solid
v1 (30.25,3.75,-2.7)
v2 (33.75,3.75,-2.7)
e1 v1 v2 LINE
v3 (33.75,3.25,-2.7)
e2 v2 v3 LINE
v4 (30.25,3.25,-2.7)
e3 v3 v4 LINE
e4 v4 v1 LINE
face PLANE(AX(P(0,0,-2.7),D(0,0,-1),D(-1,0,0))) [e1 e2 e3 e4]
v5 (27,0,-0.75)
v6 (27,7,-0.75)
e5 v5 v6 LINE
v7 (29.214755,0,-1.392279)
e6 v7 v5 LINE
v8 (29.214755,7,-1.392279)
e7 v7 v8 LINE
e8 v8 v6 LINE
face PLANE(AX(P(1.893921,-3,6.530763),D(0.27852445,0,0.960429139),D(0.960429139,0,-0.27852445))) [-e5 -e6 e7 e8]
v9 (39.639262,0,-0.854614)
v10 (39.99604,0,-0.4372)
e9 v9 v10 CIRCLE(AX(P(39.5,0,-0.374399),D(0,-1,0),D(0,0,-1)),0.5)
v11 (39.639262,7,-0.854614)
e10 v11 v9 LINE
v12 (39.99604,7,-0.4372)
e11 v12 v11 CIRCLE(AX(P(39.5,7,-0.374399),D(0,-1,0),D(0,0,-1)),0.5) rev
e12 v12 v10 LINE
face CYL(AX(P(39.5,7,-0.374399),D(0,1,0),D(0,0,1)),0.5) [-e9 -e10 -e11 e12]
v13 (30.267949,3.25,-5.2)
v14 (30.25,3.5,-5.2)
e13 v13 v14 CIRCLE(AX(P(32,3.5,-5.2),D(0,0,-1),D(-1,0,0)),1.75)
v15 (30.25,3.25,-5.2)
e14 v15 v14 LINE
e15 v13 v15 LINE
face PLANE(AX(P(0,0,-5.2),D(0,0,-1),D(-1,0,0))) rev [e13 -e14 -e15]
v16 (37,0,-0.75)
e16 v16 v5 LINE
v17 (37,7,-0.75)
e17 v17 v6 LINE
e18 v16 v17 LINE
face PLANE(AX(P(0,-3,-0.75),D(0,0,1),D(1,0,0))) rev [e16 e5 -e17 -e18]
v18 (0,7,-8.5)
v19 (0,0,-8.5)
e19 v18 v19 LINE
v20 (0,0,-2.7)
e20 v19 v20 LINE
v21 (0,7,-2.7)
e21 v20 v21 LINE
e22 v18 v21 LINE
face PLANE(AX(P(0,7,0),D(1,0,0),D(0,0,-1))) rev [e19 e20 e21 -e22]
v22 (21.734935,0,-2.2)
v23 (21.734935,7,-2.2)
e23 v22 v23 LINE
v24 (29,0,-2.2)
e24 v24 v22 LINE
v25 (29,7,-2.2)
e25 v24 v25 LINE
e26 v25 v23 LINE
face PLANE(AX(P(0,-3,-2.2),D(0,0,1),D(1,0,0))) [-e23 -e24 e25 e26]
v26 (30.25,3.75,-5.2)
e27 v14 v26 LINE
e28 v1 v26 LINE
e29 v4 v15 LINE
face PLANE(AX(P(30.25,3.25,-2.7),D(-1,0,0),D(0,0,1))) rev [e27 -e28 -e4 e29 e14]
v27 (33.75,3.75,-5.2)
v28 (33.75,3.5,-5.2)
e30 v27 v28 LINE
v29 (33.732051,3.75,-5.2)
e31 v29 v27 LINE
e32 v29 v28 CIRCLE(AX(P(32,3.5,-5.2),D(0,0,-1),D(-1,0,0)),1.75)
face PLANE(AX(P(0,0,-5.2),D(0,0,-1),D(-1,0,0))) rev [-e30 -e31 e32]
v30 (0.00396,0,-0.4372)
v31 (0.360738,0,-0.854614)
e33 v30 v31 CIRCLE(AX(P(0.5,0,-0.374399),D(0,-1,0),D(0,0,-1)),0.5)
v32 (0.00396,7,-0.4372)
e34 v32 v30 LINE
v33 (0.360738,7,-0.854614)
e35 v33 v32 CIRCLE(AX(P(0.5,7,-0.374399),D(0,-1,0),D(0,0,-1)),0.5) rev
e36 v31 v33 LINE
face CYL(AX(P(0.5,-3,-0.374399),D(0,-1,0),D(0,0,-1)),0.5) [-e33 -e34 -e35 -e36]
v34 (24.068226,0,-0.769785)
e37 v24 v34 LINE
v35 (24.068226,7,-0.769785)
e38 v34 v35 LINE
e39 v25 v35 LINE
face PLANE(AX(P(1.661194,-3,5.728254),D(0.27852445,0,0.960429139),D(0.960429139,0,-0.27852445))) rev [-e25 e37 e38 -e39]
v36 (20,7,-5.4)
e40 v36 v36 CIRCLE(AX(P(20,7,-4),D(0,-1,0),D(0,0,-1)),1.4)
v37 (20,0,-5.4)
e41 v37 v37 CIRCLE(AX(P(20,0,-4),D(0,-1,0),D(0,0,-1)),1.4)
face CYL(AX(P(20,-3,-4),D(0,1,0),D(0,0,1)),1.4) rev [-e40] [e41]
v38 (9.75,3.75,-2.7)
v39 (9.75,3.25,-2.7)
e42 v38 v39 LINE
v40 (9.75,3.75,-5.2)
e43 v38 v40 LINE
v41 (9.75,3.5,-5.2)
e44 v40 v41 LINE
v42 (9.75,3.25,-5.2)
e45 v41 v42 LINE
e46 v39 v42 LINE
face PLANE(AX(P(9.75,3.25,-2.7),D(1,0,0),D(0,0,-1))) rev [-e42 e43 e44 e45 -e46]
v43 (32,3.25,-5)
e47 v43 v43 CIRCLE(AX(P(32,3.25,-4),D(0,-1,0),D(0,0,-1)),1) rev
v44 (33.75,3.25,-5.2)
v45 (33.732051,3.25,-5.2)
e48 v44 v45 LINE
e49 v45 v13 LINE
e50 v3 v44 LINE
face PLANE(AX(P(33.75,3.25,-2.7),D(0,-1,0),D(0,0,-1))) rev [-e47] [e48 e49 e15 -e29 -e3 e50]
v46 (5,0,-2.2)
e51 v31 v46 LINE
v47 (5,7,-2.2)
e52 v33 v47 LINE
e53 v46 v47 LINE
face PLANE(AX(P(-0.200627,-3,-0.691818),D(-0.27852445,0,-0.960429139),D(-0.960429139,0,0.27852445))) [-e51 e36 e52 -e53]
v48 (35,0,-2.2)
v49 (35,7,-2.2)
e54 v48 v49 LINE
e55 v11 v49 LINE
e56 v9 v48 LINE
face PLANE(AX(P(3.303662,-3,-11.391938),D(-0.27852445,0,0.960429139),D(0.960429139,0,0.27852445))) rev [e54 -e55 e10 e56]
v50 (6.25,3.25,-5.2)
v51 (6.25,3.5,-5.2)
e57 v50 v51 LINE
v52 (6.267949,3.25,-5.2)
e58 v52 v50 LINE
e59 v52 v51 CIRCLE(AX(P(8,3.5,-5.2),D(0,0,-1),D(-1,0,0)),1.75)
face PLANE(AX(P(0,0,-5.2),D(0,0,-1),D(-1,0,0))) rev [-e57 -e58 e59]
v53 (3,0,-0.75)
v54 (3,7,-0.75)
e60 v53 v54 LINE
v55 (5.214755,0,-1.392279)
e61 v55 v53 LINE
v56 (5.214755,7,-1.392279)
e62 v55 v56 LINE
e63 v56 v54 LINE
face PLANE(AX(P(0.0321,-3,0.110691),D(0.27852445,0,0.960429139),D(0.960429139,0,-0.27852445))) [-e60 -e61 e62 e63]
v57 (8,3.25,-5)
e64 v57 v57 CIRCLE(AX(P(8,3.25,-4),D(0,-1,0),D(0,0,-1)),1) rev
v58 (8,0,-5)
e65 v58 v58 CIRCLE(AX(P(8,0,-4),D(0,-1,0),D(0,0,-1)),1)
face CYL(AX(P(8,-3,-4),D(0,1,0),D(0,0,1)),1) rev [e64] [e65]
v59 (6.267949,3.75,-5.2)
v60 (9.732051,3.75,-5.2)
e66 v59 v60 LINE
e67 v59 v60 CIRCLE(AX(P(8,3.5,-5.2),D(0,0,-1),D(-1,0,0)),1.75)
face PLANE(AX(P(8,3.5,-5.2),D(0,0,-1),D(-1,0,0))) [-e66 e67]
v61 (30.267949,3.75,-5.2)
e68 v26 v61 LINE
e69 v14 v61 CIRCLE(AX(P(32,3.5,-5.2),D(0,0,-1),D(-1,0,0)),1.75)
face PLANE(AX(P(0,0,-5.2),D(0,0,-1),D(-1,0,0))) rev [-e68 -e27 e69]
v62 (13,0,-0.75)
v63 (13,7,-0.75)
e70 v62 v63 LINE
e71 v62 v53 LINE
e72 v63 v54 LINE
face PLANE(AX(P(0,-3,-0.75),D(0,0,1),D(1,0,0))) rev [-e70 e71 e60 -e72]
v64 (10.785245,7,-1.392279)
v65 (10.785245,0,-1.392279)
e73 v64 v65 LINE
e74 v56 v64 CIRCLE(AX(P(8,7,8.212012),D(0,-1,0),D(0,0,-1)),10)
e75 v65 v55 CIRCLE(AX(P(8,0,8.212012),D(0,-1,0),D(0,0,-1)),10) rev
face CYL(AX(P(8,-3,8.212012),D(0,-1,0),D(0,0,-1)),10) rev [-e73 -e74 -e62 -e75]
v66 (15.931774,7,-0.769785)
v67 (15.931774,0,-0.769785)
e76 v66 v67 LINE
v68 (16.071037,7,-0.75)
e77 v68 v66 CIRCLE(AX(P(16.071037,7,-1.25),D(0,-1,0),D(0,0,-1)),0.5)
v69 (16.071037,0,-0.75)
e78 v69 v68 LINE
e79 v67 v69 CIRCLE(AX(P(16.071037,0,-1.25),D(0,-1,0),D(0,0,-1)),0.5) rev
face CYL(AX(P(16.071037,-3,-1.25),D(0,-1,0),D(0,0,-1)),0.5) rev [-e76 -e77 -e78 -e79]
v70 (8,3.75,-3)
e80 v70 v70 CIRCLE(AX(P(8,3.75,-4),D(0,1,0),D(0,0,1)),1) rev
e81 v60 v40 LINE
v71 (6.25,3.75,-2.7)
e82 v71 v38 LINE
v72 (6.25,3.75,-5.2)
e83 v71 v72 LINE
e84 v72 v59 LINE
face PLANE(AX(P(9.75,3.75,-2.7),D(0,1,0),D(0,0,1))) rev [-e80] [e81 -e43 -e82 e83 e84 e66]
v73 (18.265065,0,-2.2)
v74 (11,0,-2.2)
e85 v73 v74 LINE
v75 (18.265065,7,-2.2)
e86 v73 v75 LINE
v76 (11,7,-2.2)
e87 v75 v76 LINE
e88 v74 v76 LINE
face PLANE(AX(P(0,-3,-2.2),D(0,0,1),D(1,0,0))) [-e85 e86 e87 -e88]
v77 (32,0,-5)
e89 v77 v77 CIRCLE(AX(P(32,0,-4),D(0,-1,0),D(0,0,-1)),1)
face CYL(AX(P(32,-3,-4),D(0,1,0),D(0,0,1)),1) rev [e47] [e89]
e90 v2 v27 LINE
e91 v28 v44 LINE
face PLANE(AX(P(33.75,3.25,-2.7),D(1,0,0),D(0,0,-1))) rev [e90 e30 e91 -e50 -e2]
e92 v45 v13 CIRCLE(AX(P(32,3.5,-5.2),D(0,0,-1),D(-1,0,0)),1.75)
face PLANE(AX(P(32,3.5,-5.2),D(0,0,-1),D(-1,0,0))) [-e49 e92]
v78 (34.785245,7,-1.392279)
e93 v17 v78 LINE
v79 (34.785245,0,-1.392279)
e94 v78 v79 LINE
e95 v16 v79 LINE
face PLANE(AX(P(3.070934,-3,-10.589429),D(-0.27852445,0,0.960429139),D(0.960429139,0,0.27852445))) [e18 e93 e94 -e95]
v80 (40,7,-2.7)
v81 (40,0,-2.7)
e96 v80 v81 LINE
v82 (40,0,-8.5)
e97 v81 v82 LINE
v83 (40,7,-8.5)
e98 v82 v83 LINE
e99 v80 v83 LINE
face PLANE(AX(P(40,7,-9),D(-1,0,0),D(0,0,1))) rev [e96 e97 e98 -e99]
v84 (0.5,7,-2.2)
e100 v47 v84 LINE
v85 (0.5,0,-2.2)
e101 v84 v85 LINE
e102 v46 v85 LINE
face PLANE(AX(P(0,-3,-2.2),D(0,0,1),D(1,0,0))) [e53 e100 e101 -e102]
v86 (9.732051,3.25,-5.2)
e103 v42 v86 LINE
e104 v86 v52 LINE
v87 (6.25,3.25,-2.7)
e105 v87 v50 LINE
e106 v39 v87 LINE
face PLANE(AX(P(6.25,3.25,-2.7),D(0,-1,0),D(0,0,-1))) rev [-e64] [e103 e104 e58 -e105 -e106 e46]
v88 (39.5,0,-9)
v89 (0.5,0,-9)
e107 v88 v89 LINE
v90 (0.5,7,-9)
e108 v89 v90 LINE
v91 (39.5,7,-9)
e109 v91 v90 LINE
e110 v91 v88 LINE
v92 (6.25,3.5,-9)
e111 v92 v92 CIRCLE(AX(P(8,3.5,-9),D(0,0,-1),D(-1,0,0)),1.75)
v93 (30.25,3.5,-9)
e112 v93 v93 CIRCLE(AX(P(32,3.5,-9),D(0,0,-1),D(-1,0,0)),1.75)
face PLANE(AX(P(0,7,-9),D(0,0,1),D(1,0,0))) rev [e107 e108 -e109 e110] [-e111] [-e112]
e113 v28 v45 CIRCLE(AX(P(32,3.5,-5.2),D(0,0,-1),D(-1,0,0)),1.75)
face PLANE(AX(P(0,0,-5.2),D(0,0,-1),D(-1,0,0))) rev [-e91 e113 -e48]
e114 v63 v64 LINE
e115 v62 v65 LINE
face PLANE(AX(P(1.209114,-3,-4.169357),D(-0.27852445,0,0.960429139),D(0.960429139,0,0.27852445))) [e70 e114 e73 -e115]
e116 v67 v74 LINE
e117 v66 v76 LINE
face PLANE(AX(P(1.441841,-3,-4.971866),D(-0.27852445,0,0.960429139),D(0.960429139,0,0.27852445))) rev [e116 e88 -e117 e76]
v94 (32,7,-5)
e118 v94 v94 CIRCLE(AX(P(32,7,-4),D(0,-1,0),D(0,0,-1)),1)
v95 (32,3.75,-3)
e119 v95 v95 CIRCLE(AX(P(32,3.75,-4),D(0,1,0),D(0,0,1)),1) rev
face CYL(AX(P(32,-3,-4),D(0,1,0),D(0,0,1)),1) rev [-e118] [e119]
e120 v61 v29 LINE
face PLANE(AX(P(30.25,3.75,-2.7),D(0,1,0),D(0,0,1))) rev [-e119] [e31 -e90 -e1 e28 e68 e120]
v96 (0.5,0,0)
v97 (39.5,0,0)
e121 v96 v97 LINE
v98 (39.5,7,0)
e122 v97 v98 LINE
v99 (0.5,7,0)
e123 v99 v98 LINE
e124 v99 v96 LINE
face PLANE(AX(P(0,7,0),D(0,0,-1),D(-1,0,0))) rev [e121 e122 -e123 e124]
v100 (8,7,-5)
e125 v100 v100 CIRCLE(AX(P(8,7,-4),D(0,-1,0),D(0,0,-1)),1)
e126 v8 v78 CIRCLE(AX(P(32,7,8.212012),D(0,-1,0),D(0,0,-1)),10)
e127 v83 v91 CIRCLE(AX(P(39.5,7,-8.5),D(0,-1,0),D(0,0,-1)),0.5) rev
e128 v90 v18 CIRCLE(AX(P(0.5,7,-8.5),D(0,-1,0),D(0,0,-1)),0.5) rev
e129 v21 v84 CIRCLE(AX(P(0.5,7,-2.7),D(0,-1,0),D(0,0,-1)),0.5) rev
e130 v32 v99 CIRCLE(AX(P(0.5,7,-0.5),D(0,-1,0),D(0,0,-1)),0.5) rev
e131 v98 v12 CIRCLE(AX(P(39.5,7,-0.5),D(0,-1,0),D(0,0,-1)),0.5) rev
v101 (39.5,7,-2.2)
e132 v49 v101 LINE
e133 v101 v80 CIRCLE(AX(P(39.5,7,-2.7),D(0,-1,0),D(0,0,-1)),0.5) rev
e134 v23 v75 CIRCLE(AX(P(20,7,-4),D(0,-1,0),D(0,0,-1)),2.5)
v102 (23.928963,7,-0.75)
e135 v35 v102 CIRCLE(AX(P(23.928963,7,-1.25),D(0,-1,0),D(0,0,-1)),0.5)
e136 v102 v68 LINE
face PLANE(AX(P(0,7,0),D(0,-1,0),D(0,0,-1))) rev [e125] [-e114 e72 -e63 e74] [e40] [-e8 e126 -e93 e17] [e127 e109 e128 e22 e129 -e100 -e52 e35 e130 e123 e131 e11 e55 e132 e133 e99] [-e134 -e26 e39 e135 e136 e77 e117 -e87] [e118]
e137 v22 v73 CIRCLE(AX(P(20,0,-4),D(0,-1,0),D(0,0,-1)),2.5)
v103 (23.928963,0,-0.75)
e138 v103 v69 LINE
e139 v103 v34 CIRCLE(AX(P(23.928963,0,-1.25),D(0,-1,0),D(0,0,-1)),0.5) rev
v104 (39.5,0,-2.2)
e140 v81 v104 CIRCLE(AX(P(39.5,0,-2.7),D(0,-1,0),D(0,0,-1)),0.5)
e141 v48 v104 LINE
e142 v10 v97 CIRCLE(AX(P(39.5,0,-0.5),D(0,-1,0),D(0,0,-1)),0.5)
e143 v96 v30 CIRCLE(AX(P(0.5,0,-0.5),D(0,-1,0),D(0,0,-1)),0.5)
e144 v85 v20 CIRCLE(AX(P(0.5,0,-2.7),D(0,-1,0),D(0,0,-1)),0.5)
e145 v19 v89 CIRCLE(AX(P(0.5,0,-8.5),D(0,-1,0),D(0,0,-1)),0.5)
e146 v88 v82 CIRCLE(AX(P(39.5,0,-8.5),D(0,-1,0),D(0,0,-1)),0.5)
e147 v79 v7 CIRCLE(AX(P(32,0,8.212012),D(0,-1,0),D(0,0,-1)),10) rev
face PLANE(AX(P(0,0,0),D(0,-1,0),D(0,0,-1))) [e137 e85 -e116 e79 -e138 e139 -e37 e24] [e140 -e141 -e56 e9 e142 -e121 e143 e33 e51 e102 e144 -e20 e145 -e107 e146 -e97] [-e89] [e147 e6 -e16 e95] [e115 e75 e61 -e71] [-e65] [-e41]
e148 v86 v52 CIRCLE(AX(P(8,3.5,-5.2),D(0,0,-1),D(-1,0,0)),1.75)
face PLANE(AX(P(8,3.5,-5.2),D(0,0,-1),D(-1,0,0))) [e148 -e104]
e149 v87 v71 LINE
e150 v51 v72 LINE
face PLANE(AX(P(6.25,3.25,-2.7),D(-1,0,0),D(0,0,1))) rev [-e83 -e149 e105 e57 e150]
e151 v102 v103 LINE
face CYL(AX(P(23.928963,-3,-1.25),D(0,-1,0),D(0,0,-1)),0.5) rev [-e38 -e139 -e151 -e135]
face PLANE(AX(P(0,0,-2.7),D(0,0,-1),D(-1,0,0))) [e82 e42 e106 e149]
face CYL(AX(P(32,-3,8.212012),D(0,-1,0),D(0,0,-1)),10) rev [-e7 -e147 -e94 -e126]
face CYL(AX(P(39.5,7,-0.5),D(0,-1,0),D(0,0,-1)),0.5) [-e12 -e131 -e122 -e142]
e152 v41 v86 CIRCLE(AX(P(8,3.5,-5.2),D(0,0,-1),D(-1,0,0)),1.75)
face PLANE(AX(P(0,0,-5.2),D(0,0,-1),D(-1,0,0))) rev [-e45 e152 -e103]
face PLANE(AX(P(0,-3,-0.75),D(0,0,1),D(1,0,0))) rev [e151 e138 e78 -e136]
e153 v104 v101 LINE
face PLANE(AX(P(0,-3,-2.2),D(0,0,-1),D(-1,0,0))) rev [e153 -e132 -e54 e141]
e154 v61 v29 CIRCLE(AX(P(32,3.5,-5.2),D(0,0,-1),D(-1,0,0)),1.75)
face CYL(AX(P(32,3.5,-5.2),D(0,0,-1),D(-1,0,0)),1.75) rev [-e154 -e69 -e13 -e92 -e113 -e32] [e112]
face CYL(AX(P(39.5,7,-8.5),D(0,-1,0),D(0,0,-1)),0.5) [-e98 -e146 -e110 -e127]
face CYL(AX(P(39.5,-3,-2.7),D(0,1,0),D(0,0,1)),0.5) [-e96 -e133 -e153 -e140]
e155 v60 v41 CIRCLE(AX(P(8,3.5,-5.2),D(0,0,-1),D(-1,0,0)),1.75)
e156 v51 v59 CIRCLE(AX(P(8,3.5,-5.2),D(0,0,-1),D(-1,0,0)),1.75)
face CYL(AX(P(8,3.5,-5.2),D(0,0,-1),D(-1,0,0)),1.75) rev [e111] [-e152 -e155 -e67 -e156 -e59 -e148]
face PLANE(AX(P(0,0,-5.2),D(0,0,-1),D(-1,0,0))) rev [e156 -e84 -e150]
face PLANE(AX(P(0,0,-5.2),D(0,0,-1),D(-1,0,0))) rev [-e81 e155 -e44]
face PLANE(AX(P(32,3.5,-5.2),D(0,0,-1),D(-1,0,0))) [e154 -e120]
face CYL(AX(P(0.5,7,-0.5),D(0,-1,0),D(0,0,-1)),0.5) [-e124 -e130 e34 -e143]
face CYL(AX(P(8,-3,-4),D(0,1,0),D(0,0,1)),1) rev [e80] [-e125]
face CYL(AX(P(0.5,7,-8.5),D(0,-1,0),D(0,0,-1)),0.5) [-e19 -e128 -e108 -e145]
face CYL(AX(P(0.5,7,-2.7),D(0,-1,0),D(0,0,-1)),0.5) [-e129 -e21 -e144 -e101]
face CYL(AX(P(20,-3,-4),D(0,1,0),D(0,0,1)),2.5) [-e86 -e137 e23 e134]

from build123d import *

# Parameters (mm, degrees)
SKETCH1_W               = 40
SKETCH1_H               = 9
BOSS_EXTRUDE1_DEPTH     = 7
CUT_EXTRUDE1_DEPTH      = 5
CUT_EXTRUDE1_DEPTH_BACK = 10
SKETCH2_R               = 1
SKETCH2_R_2             = 1.4
FILLET1_R               = 10
FILLET2_R               = 0.5
SKETCH3_R               = 1.75
CUT_EXTRUDE6_DEPTH      = 3.8
SKETCH4_W               = 3.5
SKETCH4_H               = 0.5
CUT_EXTRUDE7_DEPTH      = 2.5


with BuildPart() as part:
    # Sketch1 → Boss-Extrude1 (new body)
    with BuildSketch(Plane(origin=(0, 0, 0), x_dir=(1, 0, 0), z_dir=(0, 1, 0))):
        with Locations((20, 4.5)):
            Rectangle(SKETCH1_W, SKETCH1_H)
    extrude(amount=BOSS_EXTRUDE1_DEPTH)

    # Sketch2 → Cut-Extrude1 (cut, two sides: drawn at the far end of the back side and taken through both)
    with BuildSketch(Plane(origin=(0, 7, 0), x_dir=(1, 0, 0), z_dir=(0, 1, 0)).offset(-CUT_EXTRUDE1_DEPTH_BACK)):
        with Locations(Location((8, 4, 0), (0, 0, 90))):
            Circle(SKETCH2_R)
        with Locations(Location((32, 4, 0), (0, 0, 90))):
            Circle(SKETCH2_R)
        with Locations(Location((20, 4, 0), (0, 0, 90))):
            Circle(SKETCH2_R_2)
        with BuildLine():
            ThreePointArc((21.734935157, 2.2), (20, 1.5), (18.265064843, 2.2))
            Line((18.265064843, 2.2), (11, 2.2))
            Line((11, 2.2), (16, 0.75))
            Line((16, 0.75), (24, 0.75))
            Line((24, 0.75), (29, 2.2))
            Line((29, 2.2), (21.734935157, 2.2))
        make_face()
        Polygon((13, 0.75), (8, 2.2), (3, 0.75), align=None)
        Polygon((37, 0.75), (32, 2.2), (27, 0.75), align=None)
        Polygon((0, 0.75), (5, 2.2), (0, 2.2), align=None)
        Polygon((40, 2.2), (35, 2.2), (40, 0.75), align=None)
    extrude(amount=CUT_EXTRUDE1_DEPTH + CUT_EXTRUDE1_DEPTH_BACK, mode=Mode.SUBTRACT)

    # Fillet1
    fillet1_edges = [part.edges().sort_by_distance(p)[0] for p in [
        (32, 3.5, -2.2),
        (8, 3.5, -2.2),
    ]]
    fillet(fillet1_edges, radius=FILLET1_R)

    # Fillet2
    # the kernel refuses this fillet: 0.5 mm, written as the material it adds along each edge
    with BuildSketch(Plane(origin=(24, 7, -0.75), x_dir=(0.9604291387787307, 0, -0.27852445024583705), z_dir=(0, -1, 0))) as fillet2_piece_1:
        with BuildLine():
            CenterArc((FILLET2_R * 0.142073204655, -FILLET2_R), FILLET2_R, 90, 16.172159016)
            Line((-FILLET2_R * 0.136451245591, -FILLET2_R * 0.0395708612213), (0, 0))
            Line((0, 0), (FILLET2_R * 0.142073204655, 0))
        make_face()
    extrude(amount=7)
    with BuildSketch(Plane(origin=(16, 0, -0.75), x_dir=(1, 0, 0), z_dir=(0, 1, 0))) as fillet2_piece_2:
        with BuildLine():
            CenterArc((FILLET2_R * 0.142073204655, FILLET2_R), FILLET2_R, 253.827840984, 16.172159016)
            Line((-FILLET2_R * 0.136451245591, FILLET2_R * 0.0395708612213), (0, 0))
            Line((0, 0), (FILLET2_R * 0.142073204655, 0))
        make_face()
    extrude(amount=7)
    # the kernel refuses this fillet: 0.5 mm, written as the material it takes off along each edge
    with BuildSketch(Plane(origin=(0, 7.939001537, -0.75), x_dir=(0.960429138778732, 0, -0.2785244502458324), z_dir=(0, -1, 0)), Plane(origin=(40, 7.939001537, -0.75), x_dir=(0, 0, 1), z_dir=(0, -1, 0))) as fillet2_2_piece_1:
        with BuildLine():
            CenterArc((FILLET2_R * 0.75120122935, FILLET2_R), FILLET2_R, 196.172159016, 73.827840984)
            Line((-FILLET2_R * 0.209227909429, FILLET2_R * 0.721475549754), (0, 0))
            Line((0, 0), (FILLET2_R * 0.75120122935, 0))
        make_face()
    extrude(amount=8.878003073, mode=Mode.SUBTRACT)
    with BuildSketch(Plane(origin=(0, 8.25, -2.2), x_dir=(0, 0, -1), z_dir=(0, -1, 0)), Plane(origin=(40, 8.25, -2.2), x_dir=(-1, 0, 0), z_dir=(0, -1, 0)), Plane(origin=(0, -1.25, 0), x_dir=(1, 0, 0), z_dir=(0, 1, 0))) as fillet2_2_piece_2:
        with BuildLine():
            CenterArc((FILLET2_R, FILLET2_R), FILLET2_R, 180, 90)
            Line((0, FILLET2_R), (0, 0))
            Line((0, 0), (FILLET2_R, 0))
        make_face()
    extrude(amount=9.5, mode=Mode.SUBTRACT)
    with BuildSketch(Plane(origin=(0, -1.25, -9), x_dir=(1, 0, 0), z_dir=(0, 1, 0)), Plane(origin=(40, -1.25, -9), x_dir=(0, 0, 1), z_dir=(0, 1, 0)), Plane(origin=(40, -1.25, 0), x_dir=(-1, 0, 0), z_dir=(0, 1, 0))) as fillet2_2_piece_3:
        with BuildLine():
            CenterArc((FILLET2_R, -FILLET2_R), FILLET2_R, 90, 90)
            Line((0, -FILLET2_R), (0, 0))
            Line((0, 0), (FILLET2_R, 0))
        make_face()
    extrude(amount=9.5, mode=Mode.SUBTRACT)

    # Sketch3 → Cut-Extrude6 (cut)
    with BuildSketch(Plane(origin=(0, 0, -9), x_dir=(-1, 0, 0), z_dir=(0, 0, -1))):
        with Locations((-32, 3.5)):
            Circle(SKETCH3_R)
        with Locations((-8, 3.5)):
            Circle(SKETCH3_R)
    extrude(amount=-CUT_EXTRUDE6_DEPTH, mode=Mode.SUBTRACT)

    # Sketch4 → Cut-Extrude7 (cut)
    with BuildSketch(Plane(origin=(0, 0, -5.2), x_dir=(-1, 0, 0), z_dir=(0, 0, -1))):
        with Locations((-32, 3.5)):
            Rectangle(SKETCH4_W, SKETCH4_H)
        with Locations((-8, 3.5)):
            Rectangle(SKETCH4_W, SKETCH4_H)
    extrude(amount=-CUT_EXTRUDE7_DEPTH, mode=Mode.SUBTRACT)


solid = part.part
